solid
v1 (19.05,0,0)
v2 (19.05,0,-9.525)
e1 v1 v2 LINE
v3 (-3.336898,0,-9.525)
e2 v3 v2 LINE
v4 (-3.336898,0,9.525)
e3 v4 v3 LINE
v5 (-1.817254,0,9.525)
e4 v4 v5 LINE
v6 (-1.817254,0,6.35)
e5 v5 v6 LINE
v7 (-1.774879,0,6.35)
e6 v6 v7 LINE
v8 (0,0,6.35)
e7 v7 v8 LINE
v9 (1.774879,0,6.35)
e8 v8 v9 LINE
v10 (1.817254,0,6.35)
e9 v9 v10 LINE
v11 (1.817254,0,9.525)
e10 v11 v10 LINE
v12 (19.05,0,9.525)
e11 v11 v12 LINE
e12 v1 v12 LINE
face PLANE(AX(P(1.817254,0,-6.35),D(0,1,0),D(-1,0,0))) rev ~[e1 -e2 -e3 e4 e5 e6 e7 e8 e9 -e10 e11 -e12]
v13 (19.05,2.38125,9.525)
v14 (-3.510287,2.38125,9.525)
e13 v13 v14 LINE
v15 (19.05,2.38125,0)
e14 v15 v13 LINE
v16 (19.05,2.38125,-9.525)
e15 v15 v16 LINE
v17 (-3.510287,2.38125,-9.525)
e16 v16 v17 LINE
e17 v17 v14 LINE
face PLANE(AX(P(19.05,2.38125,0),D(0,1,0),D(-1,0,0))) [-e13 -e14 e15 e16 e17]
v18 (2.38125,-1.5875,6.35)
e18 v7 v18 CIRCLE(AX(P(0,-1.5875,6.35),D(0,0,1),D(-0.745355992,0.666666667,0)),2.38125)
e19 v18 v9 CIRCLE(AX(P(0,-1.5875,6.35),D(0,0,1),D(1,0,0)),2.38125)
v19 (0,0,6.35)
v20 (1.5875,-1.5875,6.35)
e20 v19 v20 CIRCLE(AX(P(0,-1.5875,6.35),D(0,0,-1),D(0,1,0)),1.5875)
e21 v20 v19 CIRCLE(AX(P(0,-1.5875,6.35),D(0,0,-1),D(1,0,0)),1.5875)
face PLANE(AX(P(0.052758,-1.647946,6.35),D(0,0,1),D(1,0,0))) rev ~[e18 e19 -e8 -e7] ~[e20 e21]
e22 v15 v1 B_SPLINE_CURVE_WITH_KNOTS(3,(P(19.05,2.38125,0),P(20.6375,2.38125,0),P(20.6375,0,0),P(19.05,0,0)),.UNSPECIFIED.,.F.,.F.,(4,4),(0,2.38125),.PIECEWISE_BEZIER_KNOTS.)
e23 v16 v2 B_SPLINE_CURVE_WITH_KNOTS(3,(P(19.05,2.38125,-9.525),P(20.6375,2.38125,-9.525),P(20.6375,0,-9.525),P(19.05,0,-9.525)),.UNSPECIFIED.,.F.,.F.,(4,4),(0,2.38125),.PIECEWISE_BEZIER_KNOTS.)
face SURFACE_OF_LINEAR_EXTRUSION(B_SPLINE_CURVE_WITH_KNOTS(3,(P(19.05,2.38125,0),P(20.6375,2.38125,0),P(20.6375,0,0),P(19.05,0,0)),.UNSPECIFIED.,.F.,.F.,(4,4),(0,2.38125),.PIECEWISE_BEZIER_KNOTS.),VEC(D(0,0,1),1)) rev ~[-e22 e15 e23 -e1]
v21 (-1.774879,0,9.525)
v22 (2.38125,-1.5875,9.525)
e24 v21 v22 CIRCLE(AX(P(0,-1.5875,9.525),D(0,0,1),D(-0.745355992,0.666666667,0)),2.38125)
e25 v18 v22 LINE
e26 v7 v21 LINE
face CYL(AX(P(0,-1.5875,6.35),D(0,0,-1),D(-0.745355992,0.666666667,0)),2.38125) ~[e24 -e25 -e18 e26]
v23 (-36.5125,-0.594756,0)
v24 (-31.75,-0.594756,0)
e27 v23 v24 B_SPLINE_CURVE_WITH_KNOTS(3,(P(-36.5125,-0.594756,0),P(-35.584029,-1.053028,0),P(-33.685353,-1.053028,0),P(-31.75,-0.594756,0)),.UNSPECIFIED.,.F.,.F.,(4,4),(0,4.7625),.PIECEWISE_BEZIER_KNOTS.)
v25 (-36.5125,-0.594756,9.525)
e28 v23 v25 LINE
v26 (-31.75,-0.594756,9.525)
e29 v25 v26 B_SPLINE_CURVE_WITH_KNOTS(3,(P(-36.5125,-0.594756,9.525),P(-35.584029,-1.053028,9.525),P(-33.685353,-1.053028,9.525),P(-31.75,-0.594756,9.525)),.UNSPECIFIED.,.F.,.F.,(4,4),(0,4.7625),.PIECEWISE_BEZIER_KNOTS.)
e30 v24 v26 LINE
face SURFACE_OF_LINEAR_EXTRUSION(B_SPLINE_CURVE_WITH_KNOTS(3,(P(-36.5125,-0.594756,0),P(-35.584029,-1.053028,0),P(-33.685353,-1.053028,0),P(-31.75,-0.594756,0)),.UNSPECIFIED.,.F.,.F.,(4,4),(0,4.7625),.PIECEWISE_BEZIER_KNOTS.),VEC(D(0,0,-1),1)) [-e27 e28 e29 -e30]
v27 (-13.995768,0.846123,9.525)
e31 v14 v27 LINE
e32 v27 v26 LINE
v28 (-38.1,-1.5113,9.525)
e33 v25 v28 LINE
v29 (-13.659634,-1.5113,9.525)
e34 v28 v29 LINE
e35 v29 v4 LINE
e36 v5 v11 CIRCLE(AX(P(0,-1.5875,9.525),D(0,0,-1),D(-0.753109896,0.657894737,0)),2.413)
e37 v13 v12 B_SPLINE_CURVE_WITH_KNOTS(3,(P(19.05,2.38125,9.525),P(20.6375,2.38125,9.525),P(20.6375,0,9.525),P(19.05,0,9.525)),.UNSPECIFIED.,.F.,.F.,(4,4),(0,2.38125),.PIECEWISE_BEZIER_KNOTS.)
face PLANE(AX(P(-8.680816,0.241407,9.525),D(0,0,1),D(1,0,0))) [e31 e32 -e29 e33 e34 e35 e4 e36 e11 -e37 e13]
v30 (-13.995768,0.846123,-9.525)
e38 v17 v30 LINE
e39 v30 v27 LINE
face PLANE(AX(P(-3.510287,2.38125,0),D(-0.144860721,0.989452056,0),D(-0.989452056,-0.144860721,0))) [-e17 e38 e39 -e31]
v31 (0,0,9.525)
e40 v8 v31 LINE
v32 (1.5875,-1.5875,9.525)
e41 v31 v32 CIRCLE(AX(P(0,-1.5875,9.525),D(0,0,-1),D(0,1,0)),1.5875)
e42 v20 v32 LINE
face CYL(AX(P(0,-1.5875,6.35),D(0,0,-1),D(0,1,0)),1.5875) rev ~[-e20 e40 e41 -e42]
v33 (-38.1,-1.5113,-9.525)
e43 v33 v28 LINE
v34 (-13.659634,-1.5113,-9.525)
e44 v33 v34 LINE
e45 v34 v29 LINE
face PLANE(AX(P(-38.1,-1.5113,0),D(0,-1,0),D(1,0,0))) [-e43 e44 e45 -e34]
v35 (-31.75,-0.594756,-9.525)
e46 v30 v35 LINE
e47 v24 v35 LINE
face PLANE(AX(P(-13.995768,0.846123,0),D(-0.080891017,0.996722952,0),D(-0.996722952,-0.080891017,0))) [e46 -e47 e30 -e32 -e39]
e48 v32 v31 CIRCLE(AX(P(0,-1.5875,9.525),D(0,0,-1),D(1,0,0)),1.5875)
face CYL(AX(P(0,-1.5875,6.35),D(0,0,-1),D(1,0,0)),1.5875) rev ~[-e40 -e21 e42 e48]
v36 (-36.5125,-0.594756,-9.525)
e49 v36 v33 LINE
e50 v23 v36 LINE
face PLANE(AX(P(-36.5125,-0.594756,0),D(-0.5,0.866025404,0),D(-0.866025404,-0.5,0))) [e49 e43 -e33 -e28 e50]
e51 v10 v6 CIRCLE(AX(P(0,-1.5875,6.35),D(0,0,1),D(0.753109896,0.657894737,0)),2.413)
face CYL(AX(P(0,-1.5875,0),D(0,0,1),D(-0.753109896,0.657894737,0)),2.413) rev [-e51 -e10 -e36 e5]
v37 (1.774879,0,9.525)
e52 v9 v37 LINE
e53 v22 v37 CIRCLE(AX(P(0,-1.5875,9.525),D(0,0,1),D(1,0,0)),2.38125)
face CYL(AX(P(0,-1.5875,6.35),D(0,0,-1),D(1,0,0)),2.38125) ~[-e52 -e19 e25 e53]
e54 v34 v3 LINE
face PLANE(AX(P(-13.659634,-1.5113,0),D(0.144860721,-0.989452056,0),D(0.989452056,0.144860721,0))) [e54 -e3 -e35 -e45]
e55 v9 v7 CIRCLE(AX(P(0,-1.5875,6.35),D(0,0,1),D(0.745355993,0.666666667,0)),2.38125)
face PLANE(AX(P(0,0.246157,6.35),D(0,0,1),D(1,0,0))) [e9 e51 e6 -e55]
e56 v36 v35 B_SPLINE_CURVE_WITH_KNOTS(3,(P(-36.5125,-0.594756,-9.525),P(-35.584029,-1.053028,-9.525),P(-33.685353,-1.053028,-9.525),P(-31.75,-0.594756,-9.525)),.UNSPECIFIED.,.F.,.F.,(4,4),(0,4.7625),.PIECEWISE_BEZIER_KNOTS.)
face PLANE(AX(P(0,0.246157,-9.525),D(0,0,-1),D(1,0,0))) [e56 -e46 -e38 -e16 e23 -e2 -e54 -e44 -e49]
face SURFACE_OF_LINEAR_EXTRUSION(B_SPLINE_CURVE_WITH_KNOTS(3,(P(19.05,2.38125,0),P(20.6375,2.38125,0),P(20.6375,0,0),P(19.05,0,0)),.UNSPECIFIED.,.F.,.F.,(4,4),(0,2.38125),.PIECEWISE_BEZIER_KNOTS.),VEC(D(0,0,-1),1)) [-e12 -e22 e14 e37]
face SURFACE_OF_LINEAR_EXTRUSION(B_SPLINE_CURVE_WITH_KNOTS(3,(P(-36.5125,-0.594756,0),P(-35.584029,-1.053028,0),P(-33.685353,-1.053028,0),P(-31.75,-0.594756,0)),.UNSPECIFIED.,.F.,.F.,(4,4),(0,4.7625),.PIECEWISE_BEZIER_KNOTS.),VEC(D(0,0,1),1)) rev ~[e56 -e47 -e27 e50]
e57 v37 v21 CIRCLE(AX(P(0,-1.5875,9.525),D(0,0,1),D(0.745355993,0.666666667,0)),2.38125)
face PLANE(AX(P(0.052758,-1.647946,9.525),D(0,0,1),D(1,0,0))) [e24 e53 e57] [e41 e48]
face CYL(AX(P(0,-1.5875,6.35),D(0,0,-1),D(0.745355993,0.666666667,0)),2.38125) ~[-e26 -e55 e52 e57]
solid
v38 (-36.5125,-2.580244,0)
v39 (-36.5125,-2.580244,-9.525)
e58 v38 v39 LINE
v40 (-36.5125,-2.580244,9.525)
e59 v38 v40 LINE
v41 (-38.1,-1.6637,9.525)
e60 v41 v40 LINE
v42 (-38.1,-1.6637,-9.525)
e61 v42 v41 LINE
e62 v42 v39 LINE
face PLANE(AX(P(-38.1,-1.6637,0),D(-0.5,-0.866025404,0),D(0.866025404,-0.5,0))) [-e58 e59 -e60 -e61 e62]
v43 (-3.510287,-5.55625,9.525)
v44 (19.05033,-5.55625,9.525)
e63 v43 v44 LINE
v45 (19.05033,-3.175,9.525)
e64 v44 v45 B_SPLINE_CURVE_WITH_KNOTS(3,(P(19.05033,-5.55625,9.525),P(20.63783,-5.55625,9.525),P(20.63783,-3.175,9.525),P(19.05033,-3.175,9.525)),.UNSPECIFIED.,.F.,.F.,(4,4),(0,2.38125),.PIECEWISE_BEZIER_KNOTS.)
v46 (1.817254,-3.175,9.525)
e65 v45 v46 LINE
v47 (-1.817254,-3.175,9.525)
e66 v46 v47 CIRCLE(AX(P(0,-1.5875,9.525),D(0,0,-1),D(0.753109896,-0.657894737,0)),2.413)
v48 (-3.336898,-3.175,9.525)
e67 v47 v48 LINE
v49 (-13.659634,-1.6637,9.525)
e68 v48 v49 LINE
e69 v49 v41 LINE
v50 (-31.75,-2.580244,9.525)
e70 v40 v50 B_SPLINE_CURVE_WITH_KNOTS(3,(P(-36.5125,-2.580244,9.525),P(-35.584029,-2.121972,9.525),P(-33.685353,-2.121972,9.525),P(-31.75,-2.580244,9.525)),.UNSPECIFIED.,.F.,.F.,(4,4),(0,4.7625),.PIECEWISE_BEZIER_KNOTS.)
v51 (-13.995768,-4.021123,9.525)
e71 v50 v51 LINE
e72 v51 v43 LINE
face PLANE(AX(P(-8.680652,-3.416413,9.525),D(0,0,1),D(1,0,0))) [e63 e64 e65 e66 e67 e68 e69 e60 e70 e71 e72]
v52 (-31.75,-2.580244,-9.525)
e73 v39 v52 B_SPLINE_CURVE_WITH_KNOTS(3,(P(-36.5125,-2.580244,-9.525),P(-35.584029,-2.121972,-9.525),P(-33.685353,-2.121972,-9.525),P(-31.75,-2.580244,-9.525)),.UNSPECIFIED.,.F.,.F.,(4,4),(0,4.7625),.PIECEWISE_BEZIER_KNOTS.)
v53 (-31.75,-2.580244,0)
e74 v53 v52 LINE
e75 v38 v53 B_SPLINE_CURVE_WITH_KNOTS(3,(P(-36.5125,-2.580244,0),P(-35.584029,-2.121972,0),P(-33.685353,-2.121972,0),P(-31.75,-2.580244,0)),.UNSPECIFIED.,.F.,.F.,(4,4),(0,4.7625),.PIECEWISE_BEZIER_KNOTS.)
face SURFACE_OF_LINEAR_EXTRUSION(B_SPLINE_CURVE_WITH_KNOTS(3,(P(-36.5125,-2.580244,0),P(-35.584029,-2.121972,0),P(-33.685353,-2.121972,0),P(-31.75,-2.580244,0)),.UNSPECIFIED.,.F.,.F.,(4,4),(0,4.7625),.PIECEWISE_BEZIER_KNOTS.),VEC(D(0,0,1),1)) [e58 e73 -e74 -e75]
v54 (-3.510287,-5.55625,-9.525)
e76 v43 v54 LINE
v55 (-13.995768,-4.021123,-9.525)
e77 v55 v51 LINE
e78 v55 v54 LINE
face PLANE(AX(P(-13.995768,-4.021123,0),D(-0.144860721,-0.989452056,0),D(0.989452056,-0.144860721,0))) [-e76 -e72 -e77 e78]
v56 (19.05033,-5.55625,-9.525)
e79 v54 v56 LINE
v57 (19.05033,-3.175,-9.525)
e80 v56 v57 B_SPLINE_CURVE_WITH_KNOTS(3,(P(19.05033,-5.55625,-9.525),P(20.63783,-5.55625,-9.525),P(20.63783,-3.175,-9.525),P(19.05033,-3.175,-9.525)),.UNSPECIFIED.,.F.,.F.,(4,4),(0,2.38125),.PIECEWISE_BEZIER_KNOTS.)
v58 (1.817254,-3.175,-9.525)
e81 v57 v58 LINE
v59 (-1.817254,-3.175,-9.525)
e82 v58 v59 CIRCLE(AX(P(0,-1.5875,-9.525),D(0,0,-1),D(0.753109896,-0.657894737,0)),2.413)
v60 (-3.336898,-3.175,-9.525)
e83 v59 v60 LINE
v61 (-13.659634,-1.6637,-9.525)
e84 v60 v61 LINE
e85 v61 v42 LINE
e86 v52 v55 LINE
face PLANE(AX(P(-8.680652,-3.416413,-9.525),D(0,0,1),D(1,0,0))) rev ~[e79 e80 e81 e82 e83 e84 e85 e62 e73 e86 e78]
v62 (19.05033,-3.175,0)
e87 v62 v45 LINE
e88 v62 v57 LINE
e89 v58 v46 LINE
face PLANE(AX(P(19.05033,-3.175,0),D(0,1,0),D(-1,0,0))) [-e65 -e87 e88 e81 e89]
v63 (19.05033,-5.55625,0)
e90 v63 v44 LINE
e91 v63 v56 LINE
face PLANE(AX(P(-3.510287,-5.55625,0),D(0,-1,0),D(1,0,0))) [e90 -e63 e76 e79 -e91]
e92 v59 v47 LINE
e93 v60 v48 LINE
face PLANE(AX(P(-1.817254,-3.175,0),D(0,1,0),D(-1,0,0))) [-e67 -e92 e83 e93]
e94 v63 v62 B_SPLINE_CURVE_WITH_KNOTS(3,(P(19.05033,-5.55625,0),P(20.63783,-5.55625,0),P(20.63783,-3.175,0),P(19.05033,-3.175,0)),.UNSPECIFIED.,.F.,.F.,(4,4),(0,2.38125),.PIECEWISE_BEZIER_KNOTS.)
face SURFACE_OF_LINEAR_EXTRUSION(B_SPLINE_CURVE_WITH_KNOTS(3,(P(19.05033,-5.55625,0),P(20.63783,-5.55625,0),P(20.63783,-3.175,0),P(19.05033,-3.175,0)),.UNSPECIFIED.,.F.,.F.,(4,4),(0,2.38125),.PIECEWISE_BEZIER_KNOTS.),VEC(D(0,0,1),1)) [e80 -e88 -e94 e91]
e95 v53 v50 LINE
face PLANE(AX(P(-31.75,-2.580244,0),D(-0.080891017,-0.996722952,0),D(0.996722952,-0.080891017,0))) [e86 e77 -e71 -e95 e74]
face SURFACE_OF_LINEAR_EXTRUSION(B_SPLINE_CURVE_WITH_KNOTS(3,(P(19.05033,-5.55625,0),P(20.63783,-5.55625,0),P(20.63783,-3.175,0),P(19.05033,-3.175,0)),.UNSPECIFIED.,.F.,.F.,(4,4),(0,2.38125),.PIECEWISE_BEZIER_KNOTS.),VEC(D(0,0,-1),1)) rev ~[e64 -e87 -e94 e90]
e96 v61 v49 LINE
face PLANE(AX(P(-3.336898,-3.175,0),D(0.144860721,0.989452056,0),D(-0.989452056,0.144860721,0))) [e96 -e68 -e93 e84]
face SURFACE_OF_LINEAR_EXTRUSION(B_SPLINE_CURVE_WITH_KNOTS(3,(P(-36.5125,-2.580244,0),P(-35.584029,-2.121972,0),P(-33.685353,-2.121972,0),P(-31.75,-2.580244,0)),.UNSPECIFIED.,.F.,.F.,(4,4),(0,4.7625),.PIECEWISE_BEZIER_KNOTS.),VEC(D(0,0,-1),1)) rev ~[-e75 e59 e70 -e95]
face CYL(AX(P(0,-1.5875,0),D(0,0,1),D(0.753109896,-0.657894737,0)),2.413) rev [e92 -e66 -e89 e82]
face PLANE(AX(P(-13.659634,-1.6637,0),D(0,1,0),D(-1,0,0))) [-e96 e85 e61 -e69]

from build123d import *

# Parameters (mm, degrees)
F1_DEPTH = 9.525
F2_DEPTH = 6.35
F5_DEPTH = 3.175
F9_DEPTH = 3.175


# Not quite as in the source:
# - a feature of the source that left no trace in its solid (it failed there, or was rolled back) is left out


with BuildPart() as f1:
    # F0 (on Top) → F1 (new body, symmetric)
    with BuildSketch(Plane.XY):
        with BuildLine():
            Line((19.0503296435, -3.175), (1.8172541787, -3.175))
            ThreePointArc((1.8172541787, -3.175), (0, -4.0005), (-1.8172541787, -3.175))
            Line((-1.8172541787, -3.175), (-3.3368981663, -3.175))
            Line((-3.3368981663, -3.175), (-13.6596335379, -1.6637))
            Line((-13.6596335379, -1.6637), (-38.1, -1.6637))
            Line((-38.1, -1.6637), (-36.5125, -2.5802435523))
            add(Edge.make_bspline(
                [(-36.5125, -2.5802435523), (-35.5840288103, -2.1219717762), (-33.6853526533, -2.1219717762), (-31.75, -2.5802435523)],
                knots=[0, 0, 0, 0, 4.7625, 4.7625, 4.7625, 4.7625], degree=3))
            Line((-31.75, -2.5802435523), (-13.9957684352, -4.0211232241))
            Line((-13.9957684352, -4.0211232241), (-3.5102874127, -5.55625))
            Line((-3.5102874127, -5.55625), (19.0503296435, -5.55625))
            add(Edge.make_bspline(
                [(19.0503296435, -5.55625), (20.6378296435, -5.55625), (20.6378296435, -3.175), (19.0503296435, -3.175)],
                knots=[0, 0, 0, 0, 2.38125, 2.38125, 2.38125, 2.38125], degree=3))
        make_face()
    extrude(amount=F1_DEPTH, both=True)


with BuildPart() as f1b:
    # F0 (on Top) → F1, piece 2 (new body, symmetric)
    with BuildSketch(Plane.XY):
        with BuildLine():
            Line((1.8172541787, 0), (19.05, 0))
            add(Edge.make_bspline(
                [(19.05, 2.38125), (20.6375, 2.38125), (20.6375, 0), (19.05, 0)],
                knots=[0, 0, 0, 0, 2.38125, 2.38125, 2.38125, 2.38125], degree=3))
            Line((19.05, 2.38125), (-3.5102874127, 2.38125))
            Line((-3.5102874127, 2.38125), (-13.9957684352, 0.8461232241))
            Line((-13.9957684352, 0.8461232241), (-31.75, -0.5947564477))
            add(Edge.make_bspline(
                [(-36.5125, -0.5947564477), (-35.5840288103, -1.0530282238), (-33.6853526533, -1.0530282238), (-31.75, -0.5947564477)],
                knots=[0, 0, 0, 0, 4.7625, 4.7625, 4.7625, 4.7625], degree=3))
            Line((-36.5125, -0.5947564477), (-38.1, -1.5113))
            Line((-38.1, -1.5113), (-13.6596335379, -1.5113))
            Line((-13.6596335379, -1.5113), (-3.3368981663, 0))
            Line((-3.3368981663, 0), (-1.8172541787, 0))
            ThreePointArc((-1.8172541787, 0), (0, 0.8255), (1.8172541787, 0))
        make_face()
    extrude(amount=F1_DEPTH, both=True)

    # F0 (on Top) → F2 (join, symmetric)
    with BuildSketch(Plane.XY):
        with BuildLine():
            Line((0, 0), (1.7748789571, 0))
            ThreePointArc((1.7748789571, 0), (0, 0.79375), (-1.7748789571, 0))
            Line((-1.7748789571, 0), (0, 0))
        make_face()
        with BuildLine():
            Line((1.7748789571, 0), (1.8172541787, 0))
            ThreePointArc((1.8172541787, 0), (0, 0.8255), (-1.8172541787, 0))
            Line((-1.8172541787, 0), (-1.7748789571, 0))
            ThreePointArc((-1.7748789571, 0), (0, 0.79375), (1.7748789571, 0))
        make_face()
    extrude(amount=F2_DEPTH, both=True)

    # F3: union 

    # F4 (on face) → F5 (join)
    with BuildSketch(Plane.XY.offset(6.35)):
        with BuildLine():
            ThreePointArc((-1.7748789571, 0), (-0.8496826013, -3.8119979298), (2.38125, -1.5875))
            ThreePointArc((2.38125, -1.5875), (2.2244979298, -0.7378173987), (1.7748789571, 0))
            Line((1.7748789571, 0), (0, 0))
            Line((0, 0), (-1.7748789571, 0))
        make_face()
        with BuildLine():
            ThreePointArc((1.5875, -1.5875), (-1.1225320151, -2.7100320151), (0, 0))
            ThreePointArc((0, 0), (1.1225320151, -0.4649679849), (1.5875, -1.5875))
        make_face(mode=Mode.SUBTRACT)
        with BuildLine():
            Line((0, 0), (1.7748789571, 0))
            ThreePointArc((1.7748789571, 0), (0, 0.79375), (-1.7748789571, 0))
            Line((-1.7748789571, 0), (0, 0))
        make_face()
    extrude(amount=F5_DEPTH)

    # F8 (on face) → F9 (join)
    with BuildSketch(Plane(origin=(0, 0, -6.35), x_dir=(1, 0, 0), z_dir=(0, 0, -1))):
        with BuildLine():
            Line((-3e-10, 0), (-1.7748789571, 0))
            ThreePointArc((-1.7748789571, 0), (0, -0.79375), (1.7748789571, 0))
            Line((1.7748789571, 0), (-3e-10, 0))
        make_face()
        with BuildLine():
            ThreePointArc((1.7748789571, 0), (0, -0.79375), (-1.7748789571, 0))
            Line((-1.7748789571, 0), (-1.8172541787, 0))
            ThreePointArc((-1.8172541787, 0), (0, -0.8255), (1.8172541787, 0))
            Line((1.8172541787, 0), (1.7748789571, 0))
        make_face()
    extrude(amount=F9_DEPTH)


solid = Compound([f1.part, f1b.part])
